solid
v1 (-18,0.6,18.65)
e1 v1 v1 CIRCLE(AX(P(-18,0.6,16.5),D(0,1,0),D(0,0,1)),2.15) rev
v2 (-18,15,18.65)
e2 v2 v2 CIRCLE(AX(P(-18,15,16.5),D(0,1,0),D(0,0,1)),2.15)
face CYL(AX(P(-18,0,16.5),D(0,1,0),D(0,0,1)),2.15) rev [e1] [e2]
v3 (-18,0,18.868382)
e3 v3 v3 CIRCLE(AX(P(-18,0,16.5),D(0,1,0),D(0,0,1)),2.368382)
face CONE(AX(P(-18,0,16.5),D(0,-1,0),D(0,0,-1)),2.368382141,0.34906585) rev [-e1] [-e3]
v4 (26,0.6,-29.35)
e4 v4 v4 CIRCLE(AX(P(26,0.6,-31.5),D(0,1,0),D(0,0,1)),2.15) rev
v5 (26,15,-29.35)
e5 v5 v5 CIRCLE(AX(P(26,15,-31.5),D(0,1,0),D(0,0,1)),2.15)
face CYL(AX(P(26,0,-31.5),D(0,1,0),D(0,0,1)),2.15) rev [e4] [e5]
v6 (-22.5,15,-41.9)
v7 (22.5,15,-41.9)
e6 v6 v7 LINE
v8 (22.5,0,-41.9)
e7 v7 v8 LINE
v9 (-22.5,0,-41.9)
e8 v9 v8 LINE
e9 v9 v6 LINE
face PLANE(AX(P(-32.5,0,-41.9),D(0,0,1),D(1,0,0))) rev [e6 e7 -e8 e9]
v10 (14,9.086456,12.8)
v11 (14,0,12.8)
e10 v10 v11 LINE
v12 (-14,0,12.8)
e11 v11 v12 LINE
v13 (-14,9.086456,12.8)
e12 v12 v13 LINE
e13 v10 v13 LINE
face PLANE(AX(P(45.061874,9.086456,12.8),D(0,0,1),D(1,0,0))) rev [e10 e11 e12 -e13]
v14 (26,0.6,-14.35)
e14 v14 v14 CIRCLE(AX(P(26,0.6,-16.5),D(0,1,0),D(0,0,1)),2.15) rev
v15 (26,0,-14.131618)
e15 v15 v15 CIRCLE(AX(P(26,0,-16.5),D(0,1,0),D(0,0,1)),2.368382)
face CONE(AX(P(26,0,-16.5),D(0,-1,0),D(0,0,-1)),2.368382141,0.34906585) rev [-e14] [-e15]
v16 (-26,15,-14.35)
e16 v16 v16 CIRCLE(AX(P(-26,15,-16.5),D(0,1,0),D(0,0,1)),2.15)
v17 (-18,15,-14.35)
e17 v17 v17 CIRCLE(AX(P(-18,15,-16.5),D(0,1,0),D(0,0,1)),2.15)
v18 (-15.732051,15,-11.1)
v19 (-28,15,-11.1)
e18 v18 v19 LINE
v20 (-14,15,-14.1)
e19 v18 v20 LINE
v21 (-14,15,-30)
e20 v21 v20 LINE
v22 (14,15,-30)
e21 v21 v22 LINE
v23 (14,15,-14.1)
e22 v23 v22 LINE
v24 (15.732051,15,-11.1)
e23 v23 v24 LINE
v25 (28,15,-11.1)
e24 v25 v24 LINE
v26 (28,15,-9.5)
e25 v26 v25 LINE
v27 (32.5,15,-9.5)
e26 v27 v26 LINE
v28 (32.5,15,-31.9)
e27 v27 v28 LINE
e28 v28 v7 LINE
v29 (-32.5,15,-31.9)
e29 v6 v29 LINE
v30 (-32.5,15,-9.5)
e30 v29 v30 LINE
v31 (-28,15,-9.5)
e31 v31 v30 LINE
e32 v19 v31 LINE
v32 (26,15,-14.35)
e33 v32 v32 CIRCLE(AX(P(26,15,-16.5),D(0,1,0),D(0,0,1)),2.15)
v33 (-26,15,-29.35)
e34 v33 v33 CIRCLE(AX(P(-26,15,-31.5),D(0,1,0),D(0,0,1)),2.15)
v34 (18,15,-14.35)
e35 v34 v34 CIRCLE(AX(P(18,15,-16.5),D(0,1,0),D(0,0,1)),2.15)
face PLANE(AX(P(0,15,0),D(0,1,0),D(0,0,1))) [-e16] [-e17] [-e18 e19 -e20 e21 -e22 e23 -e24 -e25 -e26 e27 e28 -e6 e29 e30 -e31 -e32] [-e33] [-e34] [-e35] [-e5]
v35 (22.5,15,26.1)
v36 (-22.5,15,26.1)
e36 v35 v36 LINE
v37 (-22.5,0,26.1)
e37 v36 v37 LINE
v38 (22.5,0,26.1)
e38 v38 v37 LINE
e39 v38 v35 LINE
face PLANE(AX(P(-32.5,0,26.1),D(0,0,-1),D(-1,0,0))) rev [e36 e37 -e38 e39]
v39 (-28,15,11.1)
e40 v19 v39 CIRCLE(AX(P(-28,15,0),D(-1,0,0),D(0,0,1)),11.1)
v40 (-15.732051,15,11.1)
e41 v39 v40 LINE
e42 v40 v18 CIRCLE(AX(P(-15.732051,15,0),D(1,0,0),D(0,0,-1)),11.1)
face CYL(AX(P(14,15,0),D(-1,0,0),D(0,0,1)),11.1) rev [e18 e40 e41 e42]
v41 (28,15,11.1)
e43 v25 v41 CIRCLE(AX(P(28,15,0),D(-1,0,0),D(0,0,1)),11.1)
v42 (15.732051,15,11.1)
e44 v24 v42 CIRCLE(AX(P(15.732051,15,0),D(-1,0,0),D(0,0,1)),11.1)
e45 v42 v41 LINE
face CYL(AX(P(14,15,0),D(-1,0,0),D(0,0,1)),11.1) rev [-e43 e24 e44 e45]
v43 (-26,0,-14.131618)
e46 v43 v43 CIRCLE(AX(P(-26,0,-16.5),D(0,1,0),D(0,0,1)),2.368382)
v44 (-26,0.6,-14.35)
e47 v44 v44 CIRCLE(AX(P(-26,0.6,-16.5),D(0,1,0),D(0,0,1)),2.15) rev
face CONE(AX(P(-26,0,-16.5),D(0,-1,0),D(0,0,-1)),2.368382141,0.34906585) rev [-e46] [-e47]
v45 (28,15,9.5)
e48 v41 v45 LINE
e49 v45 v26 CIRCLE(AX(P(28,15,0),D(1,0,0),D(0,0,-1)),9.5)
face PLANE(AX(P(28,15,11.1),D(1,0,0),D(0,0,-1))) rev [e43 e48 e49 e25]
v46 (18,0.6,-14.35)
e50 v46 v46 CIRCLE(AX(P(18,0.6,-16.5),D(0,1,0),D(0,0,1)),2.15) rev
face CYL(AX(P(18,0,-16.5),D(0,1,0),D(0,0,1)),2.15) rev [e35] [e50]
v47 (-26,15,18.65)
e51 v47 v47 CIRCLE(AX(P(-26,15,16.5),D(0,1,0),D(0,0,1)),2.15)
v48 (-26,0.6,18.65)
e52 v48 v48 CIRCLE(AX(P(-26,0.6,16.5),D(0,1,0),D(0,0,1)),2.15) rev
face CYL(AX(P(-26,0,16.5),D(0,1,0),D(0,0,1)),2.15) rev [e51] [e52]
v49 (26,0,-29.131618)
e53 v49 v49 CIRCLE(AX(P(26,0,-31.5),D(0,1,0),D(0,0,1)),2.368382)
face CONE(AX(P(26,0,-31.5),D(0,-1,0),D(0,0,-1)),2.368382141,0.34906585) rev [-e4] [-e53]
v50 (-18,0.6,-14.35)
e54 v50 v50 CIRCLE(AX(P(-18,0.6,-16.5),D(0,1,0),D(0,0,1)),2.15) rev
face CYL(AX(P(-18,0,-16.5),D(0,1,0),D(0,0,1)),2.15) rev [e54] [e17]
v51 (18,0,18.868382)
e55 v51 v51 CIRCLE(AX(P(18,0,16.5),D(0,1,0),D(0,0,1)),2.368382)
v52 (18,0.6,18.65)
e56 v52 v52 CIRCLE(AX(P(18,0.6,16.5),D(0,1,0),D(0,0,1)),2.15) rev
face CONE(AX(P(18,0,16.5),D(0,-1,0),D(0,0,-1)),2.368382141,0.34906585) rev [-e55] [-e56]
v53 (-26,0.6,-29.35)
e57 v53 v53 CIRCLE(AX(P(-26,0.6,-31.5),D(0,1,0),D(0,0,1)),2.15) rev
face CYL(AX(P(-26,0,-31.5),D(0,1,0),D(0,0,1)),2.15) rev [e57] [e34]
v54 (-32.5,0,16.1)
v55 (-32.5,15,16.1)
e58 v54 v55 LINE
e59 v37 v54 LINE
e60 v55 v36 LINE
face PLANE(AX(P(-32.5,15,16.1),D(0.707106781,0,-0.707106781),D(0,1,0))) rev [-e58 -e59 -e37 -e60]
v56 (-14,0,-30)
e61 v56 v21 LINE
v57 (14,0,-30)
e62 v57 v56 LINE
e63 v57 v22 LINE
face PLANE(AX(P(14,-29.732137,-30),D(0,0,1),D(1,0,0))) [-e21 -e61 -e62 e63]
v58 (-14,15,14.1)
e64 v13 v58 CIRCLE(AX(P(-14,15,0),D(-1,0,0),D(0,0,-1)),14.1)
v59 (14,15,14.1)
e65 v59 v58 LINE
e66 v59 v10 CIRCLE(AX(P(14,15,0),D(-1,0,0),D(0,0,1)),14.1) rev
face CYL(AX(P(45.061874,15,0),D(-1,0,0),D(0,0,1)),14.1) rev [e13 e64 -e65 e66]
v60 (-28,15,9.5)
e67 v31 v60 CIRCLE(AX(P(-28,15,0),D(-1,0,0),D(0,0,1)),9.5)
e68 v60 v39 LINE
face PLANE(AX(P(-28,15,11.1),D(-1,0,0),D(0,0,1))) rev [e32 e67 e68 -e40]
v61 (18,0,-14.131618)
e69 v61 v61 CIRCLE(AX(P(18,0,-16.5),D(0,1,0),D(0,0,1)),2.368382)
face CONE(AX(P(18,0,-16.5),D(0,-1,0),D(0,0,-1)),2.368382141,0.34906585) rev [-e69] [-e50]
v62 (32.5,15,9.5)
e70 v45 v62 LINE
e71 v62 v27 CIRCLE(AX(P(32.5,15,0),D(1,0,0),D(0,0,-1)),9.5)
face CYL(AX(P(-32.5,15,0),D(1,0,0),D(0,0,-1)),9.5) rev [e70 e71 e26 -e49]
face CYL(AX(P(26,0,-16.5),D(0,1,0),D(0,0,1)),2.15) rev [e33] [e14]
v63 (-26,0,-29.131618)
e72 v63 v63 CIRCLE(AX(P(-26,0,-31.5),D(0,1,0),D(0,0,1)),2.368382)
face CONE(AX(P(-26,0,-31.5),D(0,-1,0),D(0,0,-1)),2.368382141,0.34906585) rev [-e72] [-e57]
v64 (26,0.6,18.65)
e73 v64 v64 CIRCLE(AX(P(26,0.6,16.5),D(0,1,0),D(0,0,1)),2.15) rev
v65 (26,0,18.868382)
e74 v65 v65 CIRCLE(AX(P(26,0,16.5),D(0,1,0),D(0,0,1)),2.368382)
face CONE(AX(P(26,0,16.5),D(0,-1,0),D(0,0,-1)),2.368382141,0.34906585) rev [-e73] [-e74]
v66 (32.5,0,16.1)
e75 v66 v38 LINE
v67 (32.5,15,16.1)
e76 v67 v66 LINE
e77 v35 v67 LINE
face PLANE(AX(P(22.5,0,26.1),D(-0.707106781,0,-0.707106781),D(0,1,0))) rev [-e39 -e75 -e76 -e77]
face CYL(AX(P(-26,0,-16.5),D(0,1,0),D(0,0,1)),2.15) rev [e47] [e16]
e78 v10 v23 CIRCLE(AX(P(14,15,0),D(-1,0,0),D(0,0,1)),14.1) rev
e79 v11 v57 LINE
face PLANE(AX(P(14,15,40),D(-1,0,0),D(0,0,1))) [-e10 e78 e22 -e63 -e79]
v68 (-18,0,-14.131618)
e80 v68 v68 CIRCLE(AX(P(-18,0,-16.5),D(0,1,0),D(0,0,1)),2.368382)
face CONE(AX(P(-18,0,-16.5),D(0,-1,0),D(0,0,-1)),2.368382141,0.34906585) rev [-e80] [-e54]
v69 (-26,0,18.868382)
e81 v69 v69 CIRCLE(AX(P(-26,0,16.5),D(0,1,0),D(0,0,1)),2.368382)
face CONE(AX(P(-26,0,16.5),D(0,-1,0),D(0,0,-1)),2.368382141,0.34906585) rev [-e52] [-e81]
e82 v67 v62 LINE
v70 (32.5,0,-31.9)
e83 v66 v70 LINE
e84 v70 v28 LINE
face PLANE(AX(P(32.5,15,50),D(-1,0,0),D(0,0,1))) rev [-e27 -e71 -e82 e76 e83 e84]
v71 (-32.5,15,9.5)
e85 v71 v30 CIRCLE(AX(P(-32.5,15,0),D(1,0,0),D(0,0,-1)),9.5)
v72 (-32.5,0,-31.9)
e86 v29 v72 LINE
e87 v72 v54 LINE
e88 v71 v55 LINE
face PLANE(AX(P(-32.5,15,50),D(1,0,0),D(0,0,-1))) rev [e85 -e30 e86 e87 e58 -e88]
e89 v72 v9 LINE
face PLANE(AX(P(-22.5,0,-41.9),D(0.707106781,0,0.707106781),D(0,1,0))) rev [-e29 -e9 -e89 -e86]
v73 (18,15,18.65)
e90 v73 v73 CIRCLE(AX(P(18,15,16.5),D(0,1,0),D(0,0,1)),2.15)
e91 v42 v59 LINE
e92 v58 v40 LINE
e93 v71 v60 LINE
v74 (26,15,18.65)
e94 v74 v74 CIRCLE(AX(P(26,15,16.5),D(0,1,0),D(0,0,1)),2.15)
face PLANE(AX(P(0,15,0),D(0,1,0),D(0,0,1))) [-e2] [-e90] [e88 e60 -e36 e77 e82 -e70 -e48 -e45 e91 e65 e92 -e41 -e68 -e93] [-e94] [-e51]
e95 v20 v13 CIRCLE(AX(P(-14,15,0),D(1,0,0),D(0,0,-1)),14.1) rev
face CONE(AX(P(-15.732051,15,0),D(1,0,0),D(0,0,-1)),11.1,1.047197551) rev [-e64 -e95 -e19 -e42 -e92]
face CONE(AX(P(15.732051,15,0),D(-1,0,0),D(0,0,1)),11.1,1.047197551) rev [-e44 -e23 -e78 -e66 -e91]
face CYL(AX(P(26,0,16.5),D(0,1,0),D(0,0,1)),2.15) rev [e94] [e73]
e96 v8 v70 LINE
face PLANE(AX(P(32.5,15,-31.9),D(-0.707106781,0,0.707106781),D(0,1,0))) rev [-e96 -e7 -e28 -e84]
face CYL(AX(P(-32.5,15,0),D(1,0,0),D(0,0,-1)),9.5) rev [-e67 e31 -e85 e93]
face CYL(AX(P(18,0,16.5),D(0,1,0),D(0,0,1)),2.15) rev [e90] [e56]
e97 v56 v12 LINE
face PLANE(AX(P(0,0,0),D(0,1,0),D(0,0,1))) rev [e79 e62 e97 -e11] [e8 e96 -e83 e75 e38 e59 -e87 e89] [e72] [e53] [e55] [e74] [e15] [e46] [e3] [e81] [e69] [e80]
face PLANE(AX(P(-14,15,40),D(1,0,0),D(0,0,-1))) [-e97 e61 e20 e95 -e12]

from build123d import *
from OCP.BRepFilletAPI import BRepFilletAPI_MakeChamfer

# Parameters (mm, degrees)
SKETCH1_W                = 65
SKETCH1_H                = 100
SKETCH1_W_2              = 28
SKETCH1_H_2              = 80
BOSS_EXTRUDE1_DEPTH      = 15
SKETCH3_W                = 14
SKETCH3_H                = 11.1
SKETCH4_R                = 9.5
CUT_EXTRUDE2_DEPTH       = 84.366660003
SKETCH8_R                = 2.15
CUT_EXTRUDE6_DEPTH       = 62.491869381
FILLET1_R                = 20
CHAMFER1_SIZE            = 3
CHAMFER1_SIZE2           = 1.732050808
SKETCH10_W               = 30
SKETCH10_H               = 5.5
BOSS_EXTRUDE2_DEPTH      = 20
BOSS_EXTRUDE3_START      = 13
SKETCH12_W               = 30
SKETCH12_H               = 3.7
BOSS_EXTRUDE3_DEPTH      = 7
BOSS_EXTRUDE4_DEPTH      = 1.3
CHAMFER3_SIZE            = 10
CHAMFER3_SIZE2           = 5.773502692
BOSS_EXTRUDE6_DEPTH      = 28
SKETCH16_W               = 65
SKETCH16_H               = 26.184127578
CUT_EXTRUDE7_DEPTH       = 75.035464475
SKETCH17_W               = 28
SKETCH17_H               = 10
BOSS_EXTRUDE7_DEPTH      = 15
SKETCH18_W               = 65
SKETCH18_H               = 20
BOSS_EXTRUDE8_DEPTH      = 15
SKETCH19_W               = 65
SKETCH19_H               = 8.1
CUT_EXTRUDE8_DEPTH       = 75.035464475
CHAMFER4_SIZE2           = 2.438662943
CHAMFER4_SIZE            = 5
CUT_EXTRUDE10_DEPTH      = 3
CHAMFER5_SIZE            = 10
SKETCH26_R               = 2.15
CUT_EXTRUDE11_DEPTH      = 69.824850163
CUT_EXTRUDE12_DEPTH      = 68.838853174
CUT_EXTRUDE12_DEPTH_BACK = 68.838853174
CHAMFER6_SIZE            = 0.6
CHAMFER6_SIZE2           = 0.218382141


with BuildPart() as part:
    # Sketch1 → Boss-Extrude1 (new body)
    with BuildSketch(Plane(origin=(0, 0, 0), x_dir=(1, 0, 0), z_dir=(0, 1, 0))):
        Rectangle(SKETCH1_W, SKETCH1_H)
        Rectangle(SKETCH1_W_2, SKETCH1_H_2, mode=Mode.SUBTRACT)
    extrude(amount=BOSS_EXTRUDE1_DEPTH)

    # Sketch3 → Cut-Revolve1 (revolve, cut)
    with BuildSketch(Plane(origin=(0, 15, 0), x_dir=(1, 0, 0), z_dir=(0, 1, 0))):
        with Locations((21, -5.55)):
            Rectangle(SKETCH3_W, SKETCH3_H)
        with Locations((-21, -5.55)):
            Rectangle(SKETCH3_W, SKETCH3_H)
    revolve(axis=Axis((14, 15, 0), (1, 0, 0)), mode=Mode.SUBTRACT)

    # Sketch4 → Cut-Extrude2 (cut, through all)
    with BuildSketch(Plane(origin=(32.5, 0, 0), x_dir=(0, 0, -1), z_dir=(1, 0, 0))):
        with Locations((0, 15)):
            Circle(SKETCH4_R)
    extrude(amount=-CUT_EXTRUDE2_DEPTH, mode=Mode.SUBTRACT)

    # Sketch8 → Cut-Extrude6 (cut, through all)
    with BuildSketch(Plane(origin=(0, 15, 0), x_dir=(1, 0, 0), z_dir=(0, 1, 0))):
        with Locations(Location((18, 16.5, 0), (0, 0, 270))):
            Circle(SKETCH8_R)
        with Locations(Location((18, -16.5, 0), (0, 0, 270))):
            Circle(SKETCH8_R)
        with Locations(Location((-18, -16.5, 0), (0, 0, 270))):
            Circle(SKETCH8_R)
        with Locations(Location((-18, 16.5, 0), (0, 0, 270))):
            Circle(SKETCH8_R)
        with Locations((9, -27)):
            Circle(SKETCH8_R)
        with Locations((-9, -27)):
            Circle(SKETCH8_R)
        with Locations((-9, 27)):
            Circle(SKETCH8_R)
        with Locations((9, 27)):
            Circle(SKETCH8_R)
        with Locations(Location((-26, 16.5, 0), (0, 0, 270))):
            Circle(SKETCH8_R)
        with Locations(Location((26, 16.5, 0), (0, 0, 270))):
            Circle(SKETCH8_R)
        with Locations(Location((26, -16.5, 0), (0, 0, 270))):
            Circle(SKETCH8_R)
        with Locations(Location((-26, -16.5, 0), (0, 0, 270))):
            Circle(SKETCH8_R)
    extrude(amount=-CUT_EXTRUDE6_DEPTH, mode=Mode.SUBTRACT)

    # Fillet1
    fillet1_edges = [part.edges().sort_by_distance(p)[0] for p in [
        (-32.5, 7.5, -50),
        (32.5, 7.5, -50),
        (32.5, 7.5, 50),
        (-32.5, 7.5, 50),
    ]]
    fillet(fillet1_edges, radius=FILLET1_R)

    # Chamfer1: one chamfer whose edges measure the first distance from different faces: ONE call of the kernel's chamfer builder (chamfer() names one face for all edges)
    chamfer1_edges_1 = [part.edges().sort_by_distance(p)[0] for p in [
        (14, 3.9, 0),
    ]]
    chamfer1_side_1 = [part.faces().sort_by_distance(p)[0] for p in [
        (14, 0.81394103, 0),
    ]]
    chamfer1_edges_2 = [part.edges().sort_by_distance(p)[0] for p in [
        (-14, 3.9, 0),
    ]]
    chamfer1_side_2 = [part.faces().sort_by_distance(p)[0] for p in [
        (-14, 0.81394103, 0),
    ]]
    chamfer1 = BRepFilletAPI_MakeChamfer(part.part.solid().wrapped)
    for e in chamfer1_edges_1:
        chamfer1.Add(CHAMFER1_SIZE, CHAMFER1_SIZE2, e.wrapped, chamfer1_side_1[0].wrapped)  # the first distance lies on this face
    for e in chamfer1_edges_2:
        chamfer1.Add(CHAMFER1_SIZE, CHAMFER1_SIZE2, e.wrapped, chamfer1_side_2[0].wrapped)  # the first distance lies on this face
    add(Compound.cast(chamfer1.Shape()), mode=Mode.REPLACE)

    # Sketch10 → Boss-Extrude2 (add)
    with BuildSketch(Plane.ZY.offset(32.5)):
        with Locations((0, 2.75)):
            Rectangle(SKETCH10_W, SKETCH10_H)
    extrude(amount=BOSS_EXTRUDE2_DEPTH)

    # Sketch12 → Boss-Extrude3 (add)
    with BuildSketch(Plane.ZY.offset(32.5).offset(BOSS_EXTRUDE3_START)):
        with Locations((0, 7.35)):
            Rectangle(SKETCH12_W, SKETCH12_H)
    extrude(amount=BOSS_EXTRUDE3_DEPTH)

    # Sketch13 → Boss-Extrude4 (add)
    with BuildSketch(Plane(origin=(0, 9.2, 0), x_dir=(1, 0, 0), z_dir=(0, 1, 0))):
        Polygon((-51.4, 2.2), (-51.4, 1.6), (-52.5, 1.6), (-52.5, 15), (-45.5, 15), (-45.5, -15), (-52.5, -15), (-52.5, -1.6), (-51.4, -1.6), (-51.4, -2.2), (-48.2, -2.2), (-48.2, 2.2), align=None)
    extrude(amount=BOSS_EXTRUDE4_DEPTH)

    # Chamfer3: one chamfer whose edges measure the first distance from different faces: ONE call of the kernel's chamfer builder (chamfer() names one face for all edges)
    chamfer3_edges_1 = [part.edges().sort_by_distance(p)[0] for p in [
        (-52.5, 5.25, -15),
    ]]
    chamfer3_side_1 = [part.faces().sort_by_distance(p)[0] for p in [
        (-44.068965517, 4.017241379, -15),
    ]]
    chamfer3_edges_2 = [part.edges().sort_by_distance(p)[0] for p in [
        (-52.5, 5.25, 15),
    ]]
    chamfer3_side_2 = [part.faces().sort_by_distance(p)[0] for p in [
        (-44.068965517, 4.017241379, 15),
    ]]
    chamfer3 = BRepFilletAPI_MakeChamfer(part.part.solid().wrapped)
    for e in chamfer3_edges_1:
        chamfer3.Add(CHAMFER3_SIZE, CHAMFER3_SIZE2, e.wrapped, chamfer3_side_1[0].wrapped)  # the first distance lies on this face
    for e in chamfer3_edges_2:
        chamfer3.Add(CHAMFER3_SIZE, CHAMFER3_SIZE2, e.wrapped, chamfer3_side_2[0].wrapped)  # the first distance lies on this face
    add(Compound.cast(chamfer3.Shape()), mode=Mode.REPLACE)

    # Sketch15 → Boss-Extrude6 (add)
    with BuildSketch(Plane(origin=(-14, 0, 0), x_dir=(0, 0, -1), z_dir=(1, 0, 0))):
        with BuildLine():
            Line((-12.8, 9.086456223), (-12.8, 0))
            Line((-12.8, 0), (-40, 0))
            Line((-40, 0), (-40, 15))
            Line((-40, 15), (-14.1, 15))
            ThreePointArc((-14.1, 15), (-13.771165528, 11.972624899), (-12.8, 9.086456223))
        make_face()
    extrude(amount=BOSS_EXTRUDE6_DEPTH)

    # Sketch16 → Cut-Extrude7 (cut, through all)
    with BuildSketch(Plane(origin=(0, 15, 0), x_dir=(1, 0, 0), z_dir=(0, 1, 0))):
        with Locations((0, -39.192063789)):
            Rectangle(SKETCH16_W, SKETCH16_H)
    extrude(amount=-CUT_EXTRUDE7_DEPTH, mode=Mode.SUBTRACT)

    # Sketch17 → Boss-Extrude7 (add)
    with BuildSketch(Plane(origin=(0, 15, 0), x_dir=(1, 0, 0), z_dir=(0, 1, 0))):
        with Locations((0, 35)):
            Rectangle(SKETCH17_W, SKETCH17_H)
    extrude(amount=-BOSS_EXTRUDE7_DEPTH)

    # Sketch18 → Boss-Extrude8 (add)
    with BuildSketch(Plane(origin=(0, 15, 0), x_dir=(1, 0, 0), z_dir=(0, 1, 0))):
        with Locations((0, 40)):
            Rectangle(SKETCH18_W, SKETCH18_H)
    extrude(amount=-BOSS_EXTRUDE8_DEPTH)

    # Sketch19 → Cut-Extrude8 (cut, through all)
    with BuildSketch(Plane(origin=(0, 15, 0), x_dir=(1, 0, 0), z_dir=(0, 1, 0))):
        with Locations((0, 45.95)):
            Rectangle(SKETCH19_W, SKETCH19_H)
    extrude(amount=-CUT_EXTRUDE8_DEPTH, mode=Mode.SUBTRACT)

    # Chamfer4
    chamfer4_edges = [part.edges().sort_by_distance(p)[0] for p in [
        (-45.5, 10.5, 0),
    ]]
    chamfer4_side = [part.faces().sort_by_distance(p)[0] for p in [
        (-45.5, 10.451226741, 0),
    ]]
    chamfer(chamfer4_edges, length=CHAMFER4_SIZE - 0.0001, length2=CHAMFER4_SIZE2 - 0.0001, reference=chamfer4_side[0])  # a hair under: the kernel refuses the full size

    # Sketch21 → Cut-Extrude10 (cut)
    with BuildSketch(Plane.XZ):
        Polygon((-32.5, -5), (-32.5, 15), (-42.5, 15), (-42.5, 5), (-52.5, 5), (-52.5, -5), align=None)
    extrude(amount=-CUT_EXTRUDE10_DEPTH, mode=Mode.SUBTRACT)

    # Chamfer5
    chamfer5_edges = [part.edges().sort_by_distance(p)[0] for p in [
        (-32.5, 7.5, 26.1),
        (32.5, 7.5, 26.1),
        (32.5, 7.5, -41.9),
        (-32.5, 7.5, -41.9),
    ]]
    chamfer(chamfer5_edges, length=CHAMFER5_SIZE)

    # Sketch26 → Cut-Extrude11 (cut, through all)
    with BuildSketch(Plane(origin=(0, 15, 0), x_dir=(1, 0, 0), z_dir=(0, 1, 0))):
        with Locations(Location((-26, 31.5, 0), (0, 0, 270))):
            Circle(SKETCH26_R)
        with Locations(Location((26, 31.5, 0), (0, 0, 270))):
            Circle(SKETCH26_R)
    extrude(amount=-CUT_EXTRUDE11_DEPTH, mode=Mode.SUBTRACT)

    # Sketch27 → Cut-Extrude12 (cut, two sides: drawn at the far end of the back side and taken through both)
    with BuildSketch(Plane(origin=(0, 5.5, 0), x_dir=(1, 0, 0), z_dir=(0, 1, 0)).offset(-CUT_EXTRUDE12_DEPTH_BACK)):
        Polygon((-32.5, 15), (-61.168127917, 15), (-61.168127917, -18.062525398), (-32.5, -15), align=None)
    extrude(amount=CUT_EXTRUDE12_DEPTH + CUT_EXTRUDE12_DEPTH_BACK, mode=Mode.SUBTRACT)

    # Chamfer6: one chamfer whose edges measure the first distance from different faces: ONE call of the kernel's chamfer builder (chamfer() names one face for all edges)
    chamfer6_edges_1 = [part.edges().sort_by_distance(p)[0] for p in [
        (-26, 0, -33.65),
    ]]
    chamfer6_side_1 = [part.faces().sort_by_distance(p)[0] for p in [
        (-26, 7.5, -33.65),
    ]]
    chamfer6_edges_2 = [part.edges().sort_by_distance(p)[0] for p in [
        (26, 0, -33.65),
    ]]
    chamfer6_side_2 = [part.faces().sort_by_distance(p)[0] for p in [
        (26, 7.5, -33.65),
    ]]
    chamfer6_edges_3 = [part.edges().sort_by_distance(p)[0] for p in [
        (18, 0, -18.65),
    ]]
    chamfer6_side_3 = [part.faces().sort_by_distance(p)[0] for p in [
        (18, 7.5, -18.65),
    ]]
    chamfer6_edges_4 = [part.edges().sort_by_distance(p)[0] for p in [
        (26, 0, -18.65),
    ]]
    chamfer6_side_4 = [part.faces().sort_by_distance(p)[0] for p in [
        (26, 7.5, -18.65),
    ]]
    chamfer6_edges_5 = [part.edges().sort_by_distance(p)[0] for p in [
        (26, 0, 14.35),
    ]]
    chamfer6_side_5 = [part.faces().sort_by_distance(p)[0] for p in [
        (26, 7.5, 14.35),
    ]]
    chamfer6_edges_6 = [part.edges().sort_by_distance(p)[0] for p in [
        (-26, 0, 14.35),
    ]]
    chamfer6_side_6 = [part.faces().sort_by_distance(p)[0] for p in [
        (-26, 7.5, 14.35),
    ]]
    chamfer6_edges_7 = [part.edges().sort_by_distance(p)[0] for p in [
        (18, 0, 14.35),
    ]]
    chamfer6_side_7 = [part.faces().sort_by_distance(p)[0] for p in [
        (18, 7.5, 14.35),
    ]]
    chamfer6_edges_8 = [part.edges().sort_by_distance(p)[0] for p in [
        (-18, 0, 14.35),
    ]]
    chamfer6_side_8 = [part.faces().sort_by_distance(p)[0] for p in [
        (-18, 7.5, 14.35),
    ]]
    chamfer6_edges_9 = [part.edges().sort_by_distance(p)[0] for p in [
        (-26, 0, -18.65),
    ]]
    chamfer6_side_9 = [part.faces().sort_by_distance(p)[0] for p in [
        (-26, 7.5, -18.65),
    ]]
    chamfer6_edges_10 = [part.edges().sort_by_distance(p)[0] for p in [
        (-18, 0, -18.65),
    ]]
    chamfer6_side_10 = [part.faces().sort_by_distance(p)[0] for p in [
        (-18, 7.5, -18.65),
    ]]
    chamfer6 = BRepFilletAPI_MakeChamfer(part.part.solid().wrapped)
    for e in chamfer6_edges_1:
        chamfer6.Add(CHAMFER6_SIZE, CHAMFER6_SIZE2, e.wrapped, chamfer6_side_1[0].wrapped)  # the first distance lies on this face
    for e in chamfer6_edges_2:
        chamfer6.Add(CHAMFER6_SIZE, CHAMFER6_SIZE2, e.wrapped, chamfer6_side_2[0].wrapped)  # the first distance lies on this face
    for e in chamfer6_edges_3:
        chamfer6.Add(CHAMFER6_SIZE, CHAMFER6_SIZE2, e.wrapped, chamfer6_side_3[0].wrapped)  # the first distance lies on this face
    for e in chamfer6_edges_4:
        chamfer6.Add(CHAMFER6_SIZE, CHAMFER6_SIZE2, e.wrapped, chamfer6_side_4[0].wrapped)  # the first distance lies on this face
    for e in chamfer6_edges_5:
        chamfer6.Add(CHAMFER6_SIZE, CHAMFER6_SIZE2, e.wrapped, chamfer6_side_5[0].wrapped)  # the first distance lies on this face
    for e in chamfer6_edges_6:
        chamfer6.Add(CHAMFER6_SIZE, CHAMFER6_SIZE2, e.wrapped, chamfer6_side_6[0].wrapped)  # the first distance lies on this face
    for e in chamfer6_edges_7:
        chamfer6.Add(CHAMFER6_SIZE, CHAMFER6_SIZE2, e.wrapped, chamfer6_side_7[0].wrapped)  # the first distance lies on this face
    for e in chamfer6_edges_8:
        chamfer6.Add(CHAMFER6_SIZE, CHAMFER6_SIZE2, e.wrapped, chamfer6_side_8[0].wrapped)  # the first distance lies on this face
    for e in chamfer6_edges_9:
        chamfer6.Add(CHAMFER6_SIZE, CHAMFER6_SIZE2, e.wrapped, chamfer6_side_9[0].wrapped)  # the first distance lies on this face
    for e in chamfer6_edges_10:
        chamfer6.Add(CHAMFER6_SIZE, CHAMFER6_SIZE2, e.wrapped, chamfer6_side_10[0].wrapped)  # the first distance lies on this face
    add(Compound.cast(chamfer6.Shape()), mode=Mode.REPLACE)


solid = part.part
